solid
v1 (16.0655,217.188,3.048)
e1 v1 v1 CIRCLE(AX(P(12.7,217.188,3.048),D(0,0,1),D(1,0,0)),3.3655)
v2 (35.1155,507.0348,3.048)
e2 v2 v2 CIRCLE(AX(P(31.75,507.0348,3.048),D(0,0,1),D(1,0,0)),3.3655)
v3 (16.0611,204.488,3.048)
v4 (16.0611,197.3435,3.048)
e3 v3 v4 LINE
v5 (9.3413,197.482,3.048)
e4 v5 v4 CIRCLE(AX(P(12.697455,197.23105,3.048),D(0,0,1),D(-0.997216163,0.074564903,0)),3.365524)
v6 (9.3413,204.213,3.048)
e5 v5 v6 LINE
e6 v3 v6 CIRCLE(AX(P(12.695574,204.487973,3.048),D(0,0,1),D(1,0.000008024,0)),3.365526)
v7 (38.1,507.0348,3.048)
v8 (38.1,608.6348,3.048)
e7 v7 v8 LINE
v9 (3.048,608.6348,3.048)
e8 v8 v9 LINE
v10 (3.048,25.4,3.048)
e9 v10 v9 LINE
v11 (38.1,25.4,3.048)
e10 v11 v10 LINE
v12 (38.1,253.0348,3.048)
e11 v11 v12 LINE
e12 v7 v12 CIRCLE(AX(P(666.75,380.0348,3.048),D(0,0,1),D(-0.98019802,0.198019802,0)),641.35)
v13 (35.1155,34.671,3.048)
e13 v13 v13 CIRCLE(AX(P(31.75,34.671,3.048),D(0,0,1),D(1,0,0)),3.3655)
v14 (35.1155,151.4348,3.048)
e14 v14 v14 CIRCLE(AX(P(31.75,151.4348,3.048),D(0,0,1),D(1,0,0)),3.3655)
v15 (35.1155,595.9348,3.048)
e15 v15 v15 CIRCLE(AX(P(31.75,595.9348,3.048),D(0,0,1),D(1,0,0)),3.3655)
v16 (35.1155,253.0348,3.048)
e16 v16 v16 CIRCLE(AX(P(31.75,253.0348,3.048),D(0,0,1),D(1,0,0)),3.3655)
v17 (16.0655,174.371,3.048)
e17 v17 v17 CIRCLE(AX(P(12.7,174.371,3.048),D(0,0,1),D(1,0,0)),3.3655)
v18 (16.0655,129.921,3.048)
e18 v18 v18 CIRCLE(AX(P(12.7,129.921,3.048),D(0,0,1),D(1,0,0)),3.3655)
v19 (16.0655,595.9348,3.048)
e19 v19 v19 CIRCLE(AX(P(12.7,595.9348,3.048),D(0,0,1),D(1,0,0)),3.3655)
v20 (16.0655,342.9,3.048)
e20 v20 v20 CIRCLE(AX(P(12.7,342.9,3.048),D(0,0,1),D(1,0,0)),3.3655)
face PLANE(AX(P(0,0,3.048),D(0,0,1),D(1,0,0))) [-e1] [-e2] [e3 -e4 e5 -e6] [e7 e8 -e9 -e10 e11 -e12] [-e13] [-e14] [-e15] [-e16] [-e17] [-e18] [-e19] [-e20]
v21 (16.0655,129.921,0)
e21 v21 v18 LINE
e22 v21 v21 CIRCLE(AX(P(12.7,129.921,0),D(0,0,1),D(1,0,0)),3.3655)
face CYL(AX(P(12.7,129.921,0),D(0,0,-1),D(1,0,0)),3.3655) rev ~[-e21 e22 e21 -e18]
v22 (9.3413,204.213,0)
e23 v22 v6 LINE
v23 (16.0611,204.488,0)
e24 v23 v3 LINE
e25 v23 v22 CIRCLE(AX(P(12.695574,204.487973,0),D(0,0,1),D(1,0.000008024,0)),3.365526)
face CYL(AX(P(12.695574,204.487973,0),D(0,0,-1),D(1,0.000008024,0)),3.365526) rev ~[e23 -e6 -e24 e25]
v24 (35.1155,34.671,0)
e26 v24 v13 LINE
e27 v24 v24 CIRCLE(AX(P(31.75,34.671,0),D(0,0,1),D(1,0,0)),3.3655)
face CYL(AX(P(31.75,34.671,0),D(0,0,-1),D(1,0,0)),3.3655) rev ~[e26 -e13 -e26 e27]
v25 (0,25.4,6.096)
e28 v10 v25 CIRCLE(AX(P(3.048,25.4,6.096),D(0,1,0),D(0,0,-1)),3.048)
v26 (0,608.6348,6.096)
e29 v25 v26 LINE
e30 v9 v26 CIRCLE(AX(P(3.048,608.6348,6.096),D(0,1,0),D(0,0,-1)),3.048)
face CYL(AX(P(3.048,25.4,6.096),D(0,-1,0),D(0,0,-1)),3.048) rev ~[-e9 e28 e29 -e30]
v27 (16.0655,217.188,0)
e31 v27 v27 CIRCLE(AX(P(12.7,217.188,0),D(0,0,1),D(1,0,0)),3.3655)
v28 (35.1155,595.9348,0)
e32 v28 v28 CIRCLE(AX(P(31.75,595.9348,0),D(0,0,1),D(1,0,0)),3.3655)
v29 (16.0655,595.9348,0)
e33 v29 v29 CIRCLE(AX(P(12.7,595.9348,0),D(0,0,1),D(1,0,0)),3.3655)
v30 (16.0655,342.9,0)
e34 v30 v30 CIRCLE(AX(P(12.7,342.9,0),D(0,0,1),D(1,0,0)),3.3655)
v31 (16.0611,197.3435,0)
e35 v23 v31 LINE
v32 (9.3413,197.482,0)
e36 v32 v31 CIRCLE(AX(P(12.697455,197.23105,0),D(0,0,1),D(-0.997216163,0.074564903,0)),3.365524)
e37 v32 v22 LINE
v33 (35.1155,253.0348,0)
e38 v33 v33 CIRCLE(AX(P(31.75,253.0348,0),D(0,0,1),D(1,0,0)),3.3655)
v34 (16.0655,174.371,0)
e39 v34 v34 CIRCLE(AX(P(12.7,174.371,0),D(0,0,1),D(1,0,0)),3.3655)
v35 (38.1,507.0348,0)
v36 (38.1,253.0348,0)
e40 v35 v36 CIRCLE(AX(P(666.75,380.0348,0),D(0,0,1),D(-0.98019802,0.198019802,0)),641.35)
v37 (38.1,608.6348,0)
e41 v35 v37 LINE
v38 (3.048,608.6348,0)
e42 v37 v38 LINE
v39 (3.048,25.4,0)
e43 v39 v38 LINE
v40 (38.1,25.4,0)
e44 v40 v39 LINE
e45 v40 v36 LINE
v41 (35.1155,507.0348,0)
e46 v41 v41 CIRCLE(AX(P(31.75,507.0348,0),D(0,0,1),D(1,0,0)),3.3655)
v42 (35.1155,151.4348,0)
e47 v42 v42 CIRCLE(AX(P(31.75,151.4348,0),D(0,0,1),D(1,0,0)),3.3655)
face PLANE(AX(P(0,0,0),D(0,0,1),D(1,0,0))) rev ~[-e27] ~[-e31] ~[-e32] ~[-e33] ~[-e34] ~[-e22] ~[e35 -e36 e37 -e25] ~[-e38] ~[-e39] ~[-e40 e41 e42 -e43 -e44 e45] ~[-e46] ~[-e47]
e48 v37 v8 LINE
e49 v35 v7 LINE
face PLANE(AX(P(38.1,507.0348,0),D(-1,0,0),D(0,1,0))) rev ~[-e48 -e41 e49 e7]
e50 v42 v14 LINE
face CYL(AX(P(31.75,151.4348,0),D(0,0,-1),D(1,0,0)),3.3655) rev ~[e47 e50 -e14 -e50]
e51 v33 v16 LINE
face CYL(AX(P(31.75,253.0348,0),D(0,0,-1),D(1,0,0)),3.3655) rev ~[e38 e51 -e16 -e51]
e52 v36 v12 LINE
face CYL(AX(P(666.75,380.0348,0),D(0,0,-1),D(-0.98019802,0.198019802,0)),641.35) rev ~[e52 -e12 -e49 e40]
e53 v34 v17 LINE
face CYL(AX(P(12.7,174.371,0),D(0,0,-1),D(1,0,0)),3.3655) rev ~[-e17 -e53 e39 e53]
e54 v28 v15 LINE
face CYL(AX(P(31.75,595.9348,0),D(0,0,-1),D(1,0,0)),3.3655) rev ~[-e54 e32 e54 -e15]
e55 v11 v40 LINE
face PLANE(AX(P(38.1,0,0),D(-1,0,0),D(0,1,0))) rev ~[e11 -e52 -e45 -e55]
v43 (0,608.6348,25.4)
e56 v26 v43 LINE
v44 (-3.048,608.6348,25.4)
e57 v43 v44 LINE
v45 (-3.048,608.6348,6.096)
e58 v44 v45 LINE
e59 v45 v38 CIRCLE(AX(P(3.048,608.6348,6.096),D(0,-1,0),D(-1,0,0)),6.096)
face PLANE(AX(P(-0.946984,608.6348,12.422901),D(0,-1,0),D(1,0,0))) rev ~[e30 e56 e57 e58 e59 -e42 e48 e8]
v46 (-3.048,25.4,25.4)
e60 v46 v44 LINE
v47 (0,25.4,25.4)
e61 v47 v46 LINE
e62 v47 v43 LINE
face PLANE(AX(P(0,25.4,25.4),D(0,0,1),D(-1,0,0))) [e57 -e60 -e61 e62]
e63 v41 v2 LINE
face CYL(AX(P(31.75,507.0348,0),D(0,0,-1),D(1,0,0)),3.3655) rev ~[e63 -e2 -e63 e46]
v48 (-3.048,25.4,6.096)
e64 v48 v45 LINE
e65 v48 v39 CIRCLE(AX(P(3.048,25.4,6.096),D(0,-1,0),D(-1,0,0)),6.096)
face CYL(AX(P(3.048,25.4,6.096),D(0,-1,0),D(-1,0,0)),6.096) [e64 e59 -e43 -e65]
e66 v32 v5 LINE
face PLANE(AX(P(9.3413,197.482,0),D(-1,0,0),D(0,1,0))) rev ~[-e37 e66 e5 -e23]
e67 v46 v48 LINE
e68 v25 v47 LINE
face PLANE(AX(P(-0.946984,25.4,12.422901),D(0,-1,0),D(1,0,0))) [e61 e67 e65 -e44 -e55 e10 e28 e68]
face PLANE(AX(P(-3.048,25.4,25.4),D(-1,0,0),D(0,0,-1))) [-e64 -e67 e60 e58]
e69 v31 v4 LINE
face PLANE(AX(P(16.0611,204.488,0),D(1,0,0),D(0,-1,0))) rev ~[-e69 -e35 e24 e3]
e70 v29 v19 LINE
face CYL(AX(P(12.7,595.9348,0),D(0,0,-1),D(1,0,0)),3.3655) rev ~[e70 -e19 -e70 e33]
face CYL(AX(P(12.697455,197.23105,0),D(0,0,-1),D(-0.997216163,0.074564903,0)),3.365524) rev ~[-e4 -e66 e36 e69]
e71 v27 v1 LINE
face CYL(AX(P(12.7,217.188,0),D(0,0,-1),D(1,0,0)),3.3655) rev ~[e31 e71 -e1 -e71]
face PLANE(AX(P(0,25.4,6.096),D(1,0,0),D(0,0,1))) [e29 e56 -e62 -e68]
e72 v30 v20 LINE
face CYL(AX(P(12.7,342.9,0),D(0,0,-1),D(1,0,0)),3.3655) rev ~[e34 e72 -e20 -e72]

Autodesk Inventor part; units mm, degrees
ref_plane "YZ Plane" through (0, 0, 0) normal (1, 0, 0) x (0, 1, 0)
ref_plane "XZ Plane" through (0, 0, 0) normal (0, 1, 0) x (-1, 0, 0)
ref_plane "XY Plane" through (0, 0, 0) normal (0, 0, 1) x (1, 0, 0)
sketch "Sketch1" plane through (0, 0, 0) normal (0, 0, 1) x (1, 0, 0)
  line L0 (0, 0) -> (38.1, 0)
  line L1 (38.1, 0) -> (38.1, 253.0348)
  arc A0 (38.1, 507.0348) -> (38.1, 253.0348) centre (666.75, 380.0348) ccw
  line L2 (38.1, 507.0348) -> (38.1, 608.6348)
  line L3 (38.1, 608.6348) -> (0, 608.6348)
  line L4 (0, 608.6348) -> (0, 0)
  circle A1 centre (31.75, 151.4348) radius 3.3655
  circle A2 centre (31.75, 34.671) radius 3.3655
  circle A3 centre (12.7, 12.7) radius 3.3655
  circle A4 centre (12.7, 342.9) radius 3.3655
  circle A5 centre (12.7, 595.9348) radius 3.3655
  circle A6 centre (31.75, 12.7) radius 3.3655
  circle A7 centre (31.75, 253.0348) radius 3.3655
  circle A8 centre (31.75, 507.0348) radius 3.3655
  circle A9 centre (31.75, 595.9348) radius 3.3655
  line L5 (0, 557.8348) -> (0, 608.6348)
  line L6 (0, 50.8) -> (0, 0)
  line L7 (12.7, 342.9) -> (0, 304.3174) construction
  line L8 (0, 317.5) -> (0, 368.3)
  line L9 (0, 129.921) -> (12.7, 129.921) construction
  circle A10 centre (12.7, 129.921) radius 3.3655
  circle A11 centre (12.7, 174.371) radius 3.3655
  line L10 (9.3413, 197.482) -> (9.3413, 204.213)
  line L11 (16.0611, 204.488) -> (16.0611, 197.3435)
  arc A12 (16.0611, 204.488) -> (9.3413, 204.213) centre (12.6956, 204.488) ccw
  arc A13 (9.3413, 197.482) -> (16.0611, 197.3435) centre (12.6974, 197.231) ccw
  circle A14 centre (12.7, 217.188) radius 3.3655
  dimension "d0" = 38.1
  dimension "d2" = 101.6
  dimension "d4" = 457.2
  dimension "d5" = 101.6
  dimension "d6" = 666.75
  dimension "d7" = 641.35
  dimension "d9" = 116.7638
  dimension "d10" = 6.35
  dimension "d11" = 6.35
  dimension "d13" = 12.7
  dimension "d14" = 12.7
  dimension "d16" = 12.7
  dimension "d17" = 342.9
  dimension "d19" = 12.7
  dimension "d20" = 12.7
  dimension "d22" = 6.35
  dimension "d24" = 6.35
  dimension "d25" = 6.731
  dimension "d26" = 6.35
  dimension "hole" = 6.731
  dimension "d28" = 6.35
  dimension "d45" = 12.7
  dimension "d47" = 12.7
  dimension "d54" = 6.731
  dimension "d55" = 3.3655
  dimension "d56" = 3.3655
  dimension "d58" = 6.731
  dimension "d59" = 12.7
  dimension "d68" = 18.22
  dimension "d69" = 90
  dimension "d70" = 90
  dimension "d71" = 22.0389
  dimension "d72" = 28.7587
  dimension "d73" = 478.7138
  dimension "d74" = 6.35
  dimension "d75" = 6.35
  dimension "d76" = 595.9348
  dimension "d77" = 404.1468
  dimension "d78" = 411.2913
  dimension "d79" = 25.4
  dimension "d80" = 25.4
  dimension "d81" = 434.2638
  dimension "d82" = 50.8
  dimension "d83" = 240.3348
  dimension "d84" = 291.1348
  dimension "d85" = 557.8348
extrude "Plate4" add sketch "Sketch1" along normal blind 3.048
sketch "Sketch5" plane through (0, 0, 3.048) normal (0, 0, 1) x (1, 0, 0)
  line L0 (38.1, 0) -> (38.1, 253.0348) projected
  line L1 (0, 0) -> (38.1, 0)
  line L2 (38.1, 0) -> (38.1, 25.4)
  line L3 (38.1, 25.4) -> (0, 25.4)
  line L4 (0, 25.4) -> (0, 0)
  dimension "d96" = 25.4
extrude "Cut1" cut sketch "Sketch5" against normal blind 3.048
sketch "Sketch7" plane through (0, 25.4, 3.048) normal (-1, 0, 0) x (0, -1, 0)
  line L0 (-583.2348, 0) -> (0, 0)
  line L1 (0, 0) -> (0, 22.352)
  line L2 (0, 22.352) -> (-583.2348, 22.352)
  line L3 (-583.2348, 22.352) -> (-583.2348, 0)
edge flange "Flange3" height 25.4 angle 90 thickness 3.048 bend radius 3.048 thickness toward (-1, 0, 0) relief tear relief width 3.048 relief depth 1.524 edges at (0, 317.0174, 3.048) wall of the first edge with corners at (0, 608.6348, 3.048) (0, 25.4, 3.048) (0, 25.4, 25.4) (0, 608.6348, 25.4)
bend "Bend3"
corner "Corner3"
equation "\"d25\" = hole"
equation "\"d97\" = Thickness"
equation "\"d109\" = BendReliefWidth"
equation "\"d110\" = BendReliefDepth"
equation "\"d111\" = MinimumRemnant"
equation "\"d112\" = BendRadius"
equation "\"d115\" = BendRadius"
equation "\"d116\" = CornerReliefSize"
equation "\"d117\" = GapSize"
equation "\"d118\" = JacobiRadiusSize"
equation "\"BendRadius\" = Thickness"
equation "\"BendReliefWidth\" = Thickness"
equation "\"BendReliefDepth\" = 0.5 * Thickness"
equation "\"CornerReliefSize\" = 4 * Thickness"
equation "\"MinimumRemnant\" = 2 * Thickness"
equation "\"TransitionRadius\" = BendRadius"
equation "\"JacobiRadiusSize\" = BendRadius"
equation "\"GapSize\" = Thickness"
equation "\"d29\" = BendRadius"
equation "\"d32\" = BendRadius"
equation "\"d38\" = BendRadius"
equation "\"d60\" = BendRadius"
equation "\"Thickness\" = 3.048"
properties part number "clawRTOP-v2"
